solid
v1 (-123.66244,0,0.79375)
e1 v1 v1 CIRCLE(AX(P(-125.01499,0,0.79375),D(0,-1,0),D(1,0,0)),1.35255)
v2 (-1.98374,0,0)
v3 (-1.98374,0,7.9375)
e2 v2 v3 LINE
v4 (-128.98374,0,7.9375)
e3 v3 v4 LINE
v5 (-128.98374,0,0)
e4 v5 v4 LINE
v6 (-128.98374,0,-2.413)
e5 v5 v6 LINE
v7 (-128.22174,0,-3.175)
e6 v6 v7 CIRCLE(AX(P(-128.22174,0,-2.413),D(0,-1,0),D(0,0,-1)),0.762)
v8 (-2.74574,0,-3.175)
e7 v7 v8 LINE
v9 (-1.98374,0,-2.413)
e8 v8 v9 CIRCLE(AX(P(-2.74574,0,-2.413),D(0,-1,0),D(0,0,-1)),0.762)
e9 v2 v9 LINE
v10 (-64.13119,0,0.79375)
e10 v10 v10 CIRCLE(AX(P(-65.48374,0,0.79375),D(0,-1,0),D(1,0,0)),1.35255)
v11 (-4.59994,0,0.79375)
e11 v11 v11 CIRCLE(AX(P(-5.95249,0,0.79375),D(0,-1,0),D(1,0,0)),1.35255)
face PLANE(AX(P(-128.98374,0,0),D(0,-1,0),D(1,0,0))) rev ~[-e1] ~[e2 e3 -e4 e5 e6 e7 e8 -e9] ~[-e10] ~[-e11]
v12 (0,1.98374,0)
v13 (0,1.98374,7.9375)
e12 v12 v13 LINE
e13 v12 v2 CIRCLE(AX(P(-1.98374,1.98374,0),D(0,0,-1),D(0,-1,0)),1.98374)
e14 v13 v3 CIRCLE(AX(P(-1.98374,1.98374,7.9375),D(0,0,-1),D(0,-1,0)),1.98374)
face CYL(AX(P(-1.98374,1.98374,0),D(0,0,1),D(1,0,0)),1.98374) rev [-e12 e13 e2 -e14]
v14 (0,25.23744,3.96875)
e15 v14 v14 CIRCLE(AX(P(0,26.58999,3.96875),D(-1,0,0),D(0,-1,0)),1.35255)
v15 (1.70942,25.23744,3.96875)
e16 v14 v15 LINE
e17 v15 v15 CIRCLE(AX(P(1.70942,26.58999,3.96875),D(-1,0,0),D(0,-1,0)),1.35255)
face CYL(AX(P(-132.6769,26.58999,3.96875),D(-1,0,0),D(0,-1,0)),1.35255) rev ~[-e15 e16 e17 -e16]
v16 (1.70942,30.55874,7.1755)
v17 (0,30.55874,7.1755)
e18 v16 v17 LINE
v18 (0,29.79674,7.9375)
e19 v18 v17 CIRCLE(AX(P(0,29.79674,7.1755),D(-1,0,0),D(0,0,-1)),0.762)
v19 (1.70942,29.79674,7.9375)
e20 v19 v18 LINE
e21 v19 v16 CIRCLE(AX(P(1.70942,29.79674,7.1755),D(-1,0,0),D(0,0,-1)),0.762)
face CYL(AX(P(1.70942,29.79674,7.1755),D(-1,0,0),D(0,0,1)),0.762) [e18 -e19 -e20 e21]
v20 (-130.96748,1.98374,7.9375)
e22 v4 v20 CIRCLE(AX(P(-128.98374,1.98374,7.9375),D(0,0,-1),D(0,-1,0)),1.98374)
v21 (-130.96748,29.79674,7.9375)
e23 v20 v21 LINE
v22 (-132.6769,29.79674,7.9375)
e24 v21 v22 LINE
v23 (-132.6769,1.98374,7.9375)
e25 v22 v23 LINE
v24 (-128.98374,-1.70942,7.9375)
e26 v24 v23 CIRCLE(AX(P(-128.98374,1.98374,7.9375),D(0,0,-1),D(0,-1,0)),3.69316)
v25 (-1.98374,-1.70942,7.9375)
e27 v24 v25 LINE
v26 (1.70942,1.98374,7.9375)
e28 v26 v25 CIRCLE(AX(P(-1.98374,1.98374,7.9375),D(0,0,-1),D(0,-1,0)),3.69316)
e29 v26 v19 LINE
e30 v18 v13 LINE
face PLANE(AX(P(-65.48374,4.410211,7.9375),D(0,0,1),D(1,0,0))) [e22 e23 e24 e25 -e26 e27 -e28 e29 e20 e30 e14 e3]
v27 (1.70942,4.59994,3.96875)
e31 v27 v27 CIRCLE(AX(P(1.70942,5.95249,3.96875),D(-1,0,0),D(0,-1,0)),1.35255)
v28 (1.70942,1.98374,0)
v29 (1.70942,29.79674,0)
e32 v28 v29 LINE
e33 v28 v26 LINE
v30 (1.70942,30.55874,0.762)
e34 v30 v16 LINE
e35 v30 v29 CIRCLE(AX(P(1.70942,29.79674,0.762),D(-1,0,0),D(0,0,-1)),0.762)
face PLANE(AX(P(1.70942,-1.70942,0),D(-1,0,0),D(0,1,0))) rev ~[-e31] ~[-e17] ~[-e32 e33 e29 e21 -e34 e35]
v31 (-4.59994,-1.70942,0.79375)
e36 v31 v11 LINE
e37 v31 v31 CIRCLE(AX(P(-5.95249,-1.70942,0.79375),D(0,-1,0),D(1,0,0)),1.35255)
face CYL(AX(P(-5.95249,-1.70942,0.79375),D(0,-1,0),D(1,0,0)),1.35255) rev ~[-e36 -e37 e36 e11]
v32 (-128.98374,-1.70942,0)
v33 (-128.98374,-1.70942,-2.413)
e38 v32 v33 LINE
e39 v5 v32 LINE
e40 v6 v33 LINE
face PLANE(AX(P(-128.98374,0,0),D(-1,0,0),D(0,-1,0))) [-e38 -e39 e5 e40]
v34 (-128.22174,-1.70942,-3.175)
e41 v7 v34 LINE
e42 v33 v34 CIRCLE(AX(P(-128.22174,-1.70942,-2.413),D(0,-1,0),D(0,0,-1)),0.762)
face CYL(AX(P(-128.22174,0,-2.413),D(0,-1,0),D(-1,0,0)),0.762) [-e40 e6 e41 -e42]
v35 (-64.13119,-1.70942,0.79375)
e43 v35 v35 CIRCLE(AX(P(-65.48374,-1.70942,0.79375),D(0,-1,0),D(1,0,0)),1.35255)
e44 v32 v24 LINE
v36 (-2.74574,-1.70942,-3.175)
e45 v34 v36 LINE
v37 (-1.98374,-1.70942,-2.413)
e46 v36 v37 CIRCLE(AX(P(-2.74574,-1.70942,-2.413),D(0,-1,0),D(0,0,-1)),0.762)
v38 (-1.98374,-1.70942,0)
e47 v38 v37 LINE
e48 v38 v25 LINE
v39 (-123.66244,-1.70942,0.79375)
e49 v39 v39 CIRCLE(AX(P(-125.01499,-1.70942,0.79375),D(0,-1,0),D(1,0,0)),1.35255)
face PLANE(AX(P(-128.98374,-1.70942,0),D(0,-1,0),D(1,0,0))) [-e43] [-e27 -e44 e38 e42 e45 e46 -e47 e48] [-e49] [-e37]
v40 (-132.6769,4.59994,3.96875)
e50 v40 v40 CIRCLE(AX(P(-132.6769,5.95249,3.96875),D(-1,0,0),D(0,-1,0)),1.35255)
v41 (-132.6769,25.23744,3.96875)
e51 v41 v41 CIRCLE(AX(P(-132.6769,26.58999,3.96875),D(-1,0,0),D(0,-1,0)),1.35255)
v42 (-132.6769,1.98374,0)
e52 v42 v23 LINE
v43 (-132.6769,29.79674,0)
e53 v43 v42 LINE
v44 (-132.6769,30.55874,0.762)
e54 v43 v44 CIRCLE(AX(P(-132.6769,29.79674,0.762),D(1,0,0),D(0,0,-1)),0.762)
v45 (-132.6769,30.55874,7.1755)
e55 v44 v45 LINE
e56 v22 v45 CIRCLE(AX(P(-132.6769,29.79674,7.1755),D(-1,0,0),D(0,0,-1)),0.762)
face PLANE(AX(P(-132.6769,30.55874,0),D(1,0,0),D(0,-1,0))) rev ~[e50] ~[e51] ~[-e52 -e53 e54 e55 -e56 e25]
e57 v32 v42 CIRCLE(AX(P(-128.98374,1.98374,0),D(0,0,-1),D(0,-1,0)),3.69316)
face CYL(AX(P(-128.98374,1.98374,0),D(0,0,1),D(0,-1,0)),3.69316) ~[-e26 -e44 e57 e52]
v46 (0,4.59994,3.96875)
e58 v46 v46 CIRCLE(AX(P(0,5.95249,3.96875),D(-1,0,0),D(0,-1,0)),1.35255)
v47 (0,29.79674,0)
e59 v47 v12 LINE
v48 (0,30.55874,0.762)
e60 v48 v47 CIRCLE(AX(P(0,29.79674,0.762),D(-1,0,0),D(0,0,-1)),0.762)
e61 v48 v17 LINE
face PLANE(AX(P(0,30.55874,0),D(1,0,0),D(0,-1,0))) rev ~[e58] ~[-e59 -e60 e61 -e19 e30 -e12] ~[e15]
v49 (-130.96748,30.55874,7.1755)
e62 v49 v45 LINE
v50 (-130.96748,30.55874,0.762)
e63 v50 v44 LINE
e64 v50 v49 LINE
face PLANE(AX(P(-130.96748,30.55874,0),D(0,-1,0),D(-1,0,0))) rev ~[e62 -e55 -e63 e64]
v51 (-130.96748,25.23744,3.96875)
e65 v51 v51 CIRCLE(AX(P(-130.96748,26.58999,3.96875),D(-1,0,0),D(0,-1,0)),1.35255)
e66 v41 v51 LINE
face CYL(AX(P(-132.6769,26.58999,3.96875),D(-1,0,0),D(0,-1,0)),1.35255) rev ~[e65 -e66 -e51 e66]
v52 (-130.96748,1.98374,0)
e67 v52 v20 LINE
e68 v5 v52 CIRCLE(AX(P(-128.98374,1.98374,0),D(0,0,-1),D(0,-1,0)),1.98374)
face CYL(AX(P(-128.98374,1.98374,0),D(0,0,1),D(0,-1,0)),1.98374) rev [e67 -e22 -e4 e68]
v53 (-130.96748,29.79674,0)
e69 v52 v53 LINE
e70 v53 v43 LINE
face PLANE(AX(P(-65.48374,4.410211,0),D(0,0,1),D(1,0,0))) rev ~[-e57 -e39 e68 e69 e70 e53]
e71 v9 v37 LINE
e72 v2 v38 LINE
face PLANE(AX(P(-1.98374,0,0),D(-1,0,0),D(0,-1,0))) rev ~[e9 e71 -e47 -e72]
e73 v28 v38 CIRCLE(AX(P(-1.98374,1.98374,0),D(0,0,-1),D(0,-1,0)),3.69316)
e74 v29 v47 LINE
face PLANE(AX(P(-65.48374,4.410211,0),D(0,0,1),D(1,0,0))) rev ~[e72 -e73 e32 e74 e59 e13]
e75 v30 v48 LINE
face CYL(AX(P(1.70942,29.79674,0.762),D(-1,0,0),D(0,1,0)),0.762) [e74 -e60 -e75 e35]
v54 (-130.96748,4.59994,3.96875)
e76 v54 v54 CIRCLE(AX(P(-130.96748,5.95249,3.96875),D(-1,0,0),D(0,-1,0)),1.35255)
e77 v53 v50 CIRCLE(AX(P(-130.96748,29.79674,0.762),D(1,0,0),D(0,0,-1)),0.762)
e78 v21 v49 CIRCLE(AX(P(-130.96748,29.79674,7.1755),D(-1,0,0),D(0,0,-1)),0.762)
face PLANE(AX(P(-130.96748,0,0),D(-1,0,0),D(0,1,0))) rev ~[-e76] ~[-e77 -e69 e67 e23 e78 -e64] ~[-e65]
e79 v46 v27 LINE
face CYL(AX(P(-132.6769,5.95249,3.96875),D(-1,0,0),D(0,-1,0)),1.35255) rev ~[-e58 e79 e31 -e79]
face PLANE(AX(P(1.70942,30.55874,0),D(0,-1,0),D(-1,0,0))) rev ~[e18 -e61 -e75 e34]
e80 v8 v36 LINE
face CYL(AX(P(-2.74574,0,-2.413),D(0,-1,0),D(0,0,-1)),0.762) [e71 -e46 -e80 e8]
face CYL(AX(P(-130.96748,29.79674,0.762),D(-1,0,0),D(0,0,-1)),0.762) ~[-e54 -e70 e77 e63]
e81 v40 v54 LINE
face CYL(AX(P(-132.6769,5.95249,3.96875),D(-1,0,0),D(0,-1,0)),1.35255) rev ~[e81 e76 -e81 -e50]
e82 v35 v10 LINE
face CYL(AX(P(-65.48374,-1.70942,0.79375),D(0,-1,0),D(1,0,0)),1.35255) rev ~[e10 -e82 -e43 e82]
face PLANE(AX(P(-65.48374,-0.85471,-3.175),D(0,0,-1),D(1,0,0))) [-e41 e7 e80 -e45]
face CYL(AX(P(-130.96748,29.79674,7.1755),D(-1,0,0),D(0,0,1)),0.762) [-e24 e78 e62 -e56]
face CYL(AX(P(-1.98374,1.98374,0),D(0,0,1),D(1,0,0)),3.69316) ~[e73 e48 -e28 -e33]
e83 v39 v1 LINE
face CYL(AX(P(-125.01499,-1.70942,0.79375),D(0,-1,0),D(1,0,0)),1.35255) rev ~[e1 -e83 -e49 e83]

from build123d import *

# Parameters (mm, degrees)
F1_DEPTH = 7.9375
F2_R     = 1.98374
F3_R     = 3.69316
F4_R     = 1.35255
F5_DEPTH = 134.38632
F6_W     = 127
F6_H     = 1.70942
F7_DEPTH = 3.175
F8_R     = 1.35255
F9_DEPTH = 1.70942
F10_R    = 0.762


with BuildPart() as f1:
    # F0 (on Top) → F1 (new body)
    with BuildSketch(Plane.XY):
        Polygon((0, 30.55874), (0, 0), (-130.96748, 0), (-130.96748, 30.55874), (-132.6769, 30.55874), (-132.6769, -1.70942), (1.70942, -1.70942), (1.70942, 30.55874), align=None)
    extrude(amount=F1_DEPTH)

    # F2
    f2_edges = [f1.edges().sort_by_distance(p)[0] for p in [
        (0, 0, 3.96875),
        (-130.96748, 0, 3.96875),
    ]]
    fillet(f2_edges, radius=F2_R)

    # F3
    f3_edges = [f1.edges().sort_by_distance(p)[0] for p in [
        (1.70942, -1.70942, 3.96875),
        (-132.6769, -1.70942, 3.96875),
    ]]
    fillet(f3_edges, radius=F3_R)

    # F4 (on face) → F5 (cut, through all)
    with BuildSketch(Plane(origin=(-132.6769, 0, 0), x_dir=(0, -1, 0), z_dir=(-1, 0, 0))):
        with Locations((-26.58999, 3.96875)):
            Circle(F4_R)
        with Locations((-5.95249, 3.96875)):
            Circle(F4_R)
    extrude(amount=-F5_DEPTH, mode=Mode.SUBTRACT)

    # F6 (on face) → F7 (join)
    with BuildSketch(Plane(origin=(0, 0, 0), x_dir=(1, 0, 0), z_dir=(0, 0, -1))):
        with Locations((-65.48374, 0.85471)):
            Rectangle(F6_W, F6_H)
    extrude(amount=F7_DEPTH)

    # F8 (on face) → F9 (cut, through all)
    with BuildSketch(Plane.XZ.offset(1.70942)):
        with Locations((-125.01499, 0.79375)):
            Circle(F8_R)
        with Locations((-65.48374, 0.79375)):
            Circle(F8_R)
        with Locations((-5.95249, 0.79375)):
            Circle(F8_R)
    extrude(amount=-F9_DEPTH, mode=Mode.SUBTRACT)

    # F10
    f10_edges = [f1.edges().sort_by_distance(p)[0] for p in [
        (0.85471, 30.55874, 0),
        (0.85471, 30.55874, 7.9375),
        (-131.82219, 30.55874, 0),
        (-131.82219, 30.55874, 7.9375),
        (-128.98374, -0.85471, -3.175),
        (-1.98374, -0.85471, -3.175),
    ]]
    fillet(f10_edges, radius=F10_R)


solid = f1.part
